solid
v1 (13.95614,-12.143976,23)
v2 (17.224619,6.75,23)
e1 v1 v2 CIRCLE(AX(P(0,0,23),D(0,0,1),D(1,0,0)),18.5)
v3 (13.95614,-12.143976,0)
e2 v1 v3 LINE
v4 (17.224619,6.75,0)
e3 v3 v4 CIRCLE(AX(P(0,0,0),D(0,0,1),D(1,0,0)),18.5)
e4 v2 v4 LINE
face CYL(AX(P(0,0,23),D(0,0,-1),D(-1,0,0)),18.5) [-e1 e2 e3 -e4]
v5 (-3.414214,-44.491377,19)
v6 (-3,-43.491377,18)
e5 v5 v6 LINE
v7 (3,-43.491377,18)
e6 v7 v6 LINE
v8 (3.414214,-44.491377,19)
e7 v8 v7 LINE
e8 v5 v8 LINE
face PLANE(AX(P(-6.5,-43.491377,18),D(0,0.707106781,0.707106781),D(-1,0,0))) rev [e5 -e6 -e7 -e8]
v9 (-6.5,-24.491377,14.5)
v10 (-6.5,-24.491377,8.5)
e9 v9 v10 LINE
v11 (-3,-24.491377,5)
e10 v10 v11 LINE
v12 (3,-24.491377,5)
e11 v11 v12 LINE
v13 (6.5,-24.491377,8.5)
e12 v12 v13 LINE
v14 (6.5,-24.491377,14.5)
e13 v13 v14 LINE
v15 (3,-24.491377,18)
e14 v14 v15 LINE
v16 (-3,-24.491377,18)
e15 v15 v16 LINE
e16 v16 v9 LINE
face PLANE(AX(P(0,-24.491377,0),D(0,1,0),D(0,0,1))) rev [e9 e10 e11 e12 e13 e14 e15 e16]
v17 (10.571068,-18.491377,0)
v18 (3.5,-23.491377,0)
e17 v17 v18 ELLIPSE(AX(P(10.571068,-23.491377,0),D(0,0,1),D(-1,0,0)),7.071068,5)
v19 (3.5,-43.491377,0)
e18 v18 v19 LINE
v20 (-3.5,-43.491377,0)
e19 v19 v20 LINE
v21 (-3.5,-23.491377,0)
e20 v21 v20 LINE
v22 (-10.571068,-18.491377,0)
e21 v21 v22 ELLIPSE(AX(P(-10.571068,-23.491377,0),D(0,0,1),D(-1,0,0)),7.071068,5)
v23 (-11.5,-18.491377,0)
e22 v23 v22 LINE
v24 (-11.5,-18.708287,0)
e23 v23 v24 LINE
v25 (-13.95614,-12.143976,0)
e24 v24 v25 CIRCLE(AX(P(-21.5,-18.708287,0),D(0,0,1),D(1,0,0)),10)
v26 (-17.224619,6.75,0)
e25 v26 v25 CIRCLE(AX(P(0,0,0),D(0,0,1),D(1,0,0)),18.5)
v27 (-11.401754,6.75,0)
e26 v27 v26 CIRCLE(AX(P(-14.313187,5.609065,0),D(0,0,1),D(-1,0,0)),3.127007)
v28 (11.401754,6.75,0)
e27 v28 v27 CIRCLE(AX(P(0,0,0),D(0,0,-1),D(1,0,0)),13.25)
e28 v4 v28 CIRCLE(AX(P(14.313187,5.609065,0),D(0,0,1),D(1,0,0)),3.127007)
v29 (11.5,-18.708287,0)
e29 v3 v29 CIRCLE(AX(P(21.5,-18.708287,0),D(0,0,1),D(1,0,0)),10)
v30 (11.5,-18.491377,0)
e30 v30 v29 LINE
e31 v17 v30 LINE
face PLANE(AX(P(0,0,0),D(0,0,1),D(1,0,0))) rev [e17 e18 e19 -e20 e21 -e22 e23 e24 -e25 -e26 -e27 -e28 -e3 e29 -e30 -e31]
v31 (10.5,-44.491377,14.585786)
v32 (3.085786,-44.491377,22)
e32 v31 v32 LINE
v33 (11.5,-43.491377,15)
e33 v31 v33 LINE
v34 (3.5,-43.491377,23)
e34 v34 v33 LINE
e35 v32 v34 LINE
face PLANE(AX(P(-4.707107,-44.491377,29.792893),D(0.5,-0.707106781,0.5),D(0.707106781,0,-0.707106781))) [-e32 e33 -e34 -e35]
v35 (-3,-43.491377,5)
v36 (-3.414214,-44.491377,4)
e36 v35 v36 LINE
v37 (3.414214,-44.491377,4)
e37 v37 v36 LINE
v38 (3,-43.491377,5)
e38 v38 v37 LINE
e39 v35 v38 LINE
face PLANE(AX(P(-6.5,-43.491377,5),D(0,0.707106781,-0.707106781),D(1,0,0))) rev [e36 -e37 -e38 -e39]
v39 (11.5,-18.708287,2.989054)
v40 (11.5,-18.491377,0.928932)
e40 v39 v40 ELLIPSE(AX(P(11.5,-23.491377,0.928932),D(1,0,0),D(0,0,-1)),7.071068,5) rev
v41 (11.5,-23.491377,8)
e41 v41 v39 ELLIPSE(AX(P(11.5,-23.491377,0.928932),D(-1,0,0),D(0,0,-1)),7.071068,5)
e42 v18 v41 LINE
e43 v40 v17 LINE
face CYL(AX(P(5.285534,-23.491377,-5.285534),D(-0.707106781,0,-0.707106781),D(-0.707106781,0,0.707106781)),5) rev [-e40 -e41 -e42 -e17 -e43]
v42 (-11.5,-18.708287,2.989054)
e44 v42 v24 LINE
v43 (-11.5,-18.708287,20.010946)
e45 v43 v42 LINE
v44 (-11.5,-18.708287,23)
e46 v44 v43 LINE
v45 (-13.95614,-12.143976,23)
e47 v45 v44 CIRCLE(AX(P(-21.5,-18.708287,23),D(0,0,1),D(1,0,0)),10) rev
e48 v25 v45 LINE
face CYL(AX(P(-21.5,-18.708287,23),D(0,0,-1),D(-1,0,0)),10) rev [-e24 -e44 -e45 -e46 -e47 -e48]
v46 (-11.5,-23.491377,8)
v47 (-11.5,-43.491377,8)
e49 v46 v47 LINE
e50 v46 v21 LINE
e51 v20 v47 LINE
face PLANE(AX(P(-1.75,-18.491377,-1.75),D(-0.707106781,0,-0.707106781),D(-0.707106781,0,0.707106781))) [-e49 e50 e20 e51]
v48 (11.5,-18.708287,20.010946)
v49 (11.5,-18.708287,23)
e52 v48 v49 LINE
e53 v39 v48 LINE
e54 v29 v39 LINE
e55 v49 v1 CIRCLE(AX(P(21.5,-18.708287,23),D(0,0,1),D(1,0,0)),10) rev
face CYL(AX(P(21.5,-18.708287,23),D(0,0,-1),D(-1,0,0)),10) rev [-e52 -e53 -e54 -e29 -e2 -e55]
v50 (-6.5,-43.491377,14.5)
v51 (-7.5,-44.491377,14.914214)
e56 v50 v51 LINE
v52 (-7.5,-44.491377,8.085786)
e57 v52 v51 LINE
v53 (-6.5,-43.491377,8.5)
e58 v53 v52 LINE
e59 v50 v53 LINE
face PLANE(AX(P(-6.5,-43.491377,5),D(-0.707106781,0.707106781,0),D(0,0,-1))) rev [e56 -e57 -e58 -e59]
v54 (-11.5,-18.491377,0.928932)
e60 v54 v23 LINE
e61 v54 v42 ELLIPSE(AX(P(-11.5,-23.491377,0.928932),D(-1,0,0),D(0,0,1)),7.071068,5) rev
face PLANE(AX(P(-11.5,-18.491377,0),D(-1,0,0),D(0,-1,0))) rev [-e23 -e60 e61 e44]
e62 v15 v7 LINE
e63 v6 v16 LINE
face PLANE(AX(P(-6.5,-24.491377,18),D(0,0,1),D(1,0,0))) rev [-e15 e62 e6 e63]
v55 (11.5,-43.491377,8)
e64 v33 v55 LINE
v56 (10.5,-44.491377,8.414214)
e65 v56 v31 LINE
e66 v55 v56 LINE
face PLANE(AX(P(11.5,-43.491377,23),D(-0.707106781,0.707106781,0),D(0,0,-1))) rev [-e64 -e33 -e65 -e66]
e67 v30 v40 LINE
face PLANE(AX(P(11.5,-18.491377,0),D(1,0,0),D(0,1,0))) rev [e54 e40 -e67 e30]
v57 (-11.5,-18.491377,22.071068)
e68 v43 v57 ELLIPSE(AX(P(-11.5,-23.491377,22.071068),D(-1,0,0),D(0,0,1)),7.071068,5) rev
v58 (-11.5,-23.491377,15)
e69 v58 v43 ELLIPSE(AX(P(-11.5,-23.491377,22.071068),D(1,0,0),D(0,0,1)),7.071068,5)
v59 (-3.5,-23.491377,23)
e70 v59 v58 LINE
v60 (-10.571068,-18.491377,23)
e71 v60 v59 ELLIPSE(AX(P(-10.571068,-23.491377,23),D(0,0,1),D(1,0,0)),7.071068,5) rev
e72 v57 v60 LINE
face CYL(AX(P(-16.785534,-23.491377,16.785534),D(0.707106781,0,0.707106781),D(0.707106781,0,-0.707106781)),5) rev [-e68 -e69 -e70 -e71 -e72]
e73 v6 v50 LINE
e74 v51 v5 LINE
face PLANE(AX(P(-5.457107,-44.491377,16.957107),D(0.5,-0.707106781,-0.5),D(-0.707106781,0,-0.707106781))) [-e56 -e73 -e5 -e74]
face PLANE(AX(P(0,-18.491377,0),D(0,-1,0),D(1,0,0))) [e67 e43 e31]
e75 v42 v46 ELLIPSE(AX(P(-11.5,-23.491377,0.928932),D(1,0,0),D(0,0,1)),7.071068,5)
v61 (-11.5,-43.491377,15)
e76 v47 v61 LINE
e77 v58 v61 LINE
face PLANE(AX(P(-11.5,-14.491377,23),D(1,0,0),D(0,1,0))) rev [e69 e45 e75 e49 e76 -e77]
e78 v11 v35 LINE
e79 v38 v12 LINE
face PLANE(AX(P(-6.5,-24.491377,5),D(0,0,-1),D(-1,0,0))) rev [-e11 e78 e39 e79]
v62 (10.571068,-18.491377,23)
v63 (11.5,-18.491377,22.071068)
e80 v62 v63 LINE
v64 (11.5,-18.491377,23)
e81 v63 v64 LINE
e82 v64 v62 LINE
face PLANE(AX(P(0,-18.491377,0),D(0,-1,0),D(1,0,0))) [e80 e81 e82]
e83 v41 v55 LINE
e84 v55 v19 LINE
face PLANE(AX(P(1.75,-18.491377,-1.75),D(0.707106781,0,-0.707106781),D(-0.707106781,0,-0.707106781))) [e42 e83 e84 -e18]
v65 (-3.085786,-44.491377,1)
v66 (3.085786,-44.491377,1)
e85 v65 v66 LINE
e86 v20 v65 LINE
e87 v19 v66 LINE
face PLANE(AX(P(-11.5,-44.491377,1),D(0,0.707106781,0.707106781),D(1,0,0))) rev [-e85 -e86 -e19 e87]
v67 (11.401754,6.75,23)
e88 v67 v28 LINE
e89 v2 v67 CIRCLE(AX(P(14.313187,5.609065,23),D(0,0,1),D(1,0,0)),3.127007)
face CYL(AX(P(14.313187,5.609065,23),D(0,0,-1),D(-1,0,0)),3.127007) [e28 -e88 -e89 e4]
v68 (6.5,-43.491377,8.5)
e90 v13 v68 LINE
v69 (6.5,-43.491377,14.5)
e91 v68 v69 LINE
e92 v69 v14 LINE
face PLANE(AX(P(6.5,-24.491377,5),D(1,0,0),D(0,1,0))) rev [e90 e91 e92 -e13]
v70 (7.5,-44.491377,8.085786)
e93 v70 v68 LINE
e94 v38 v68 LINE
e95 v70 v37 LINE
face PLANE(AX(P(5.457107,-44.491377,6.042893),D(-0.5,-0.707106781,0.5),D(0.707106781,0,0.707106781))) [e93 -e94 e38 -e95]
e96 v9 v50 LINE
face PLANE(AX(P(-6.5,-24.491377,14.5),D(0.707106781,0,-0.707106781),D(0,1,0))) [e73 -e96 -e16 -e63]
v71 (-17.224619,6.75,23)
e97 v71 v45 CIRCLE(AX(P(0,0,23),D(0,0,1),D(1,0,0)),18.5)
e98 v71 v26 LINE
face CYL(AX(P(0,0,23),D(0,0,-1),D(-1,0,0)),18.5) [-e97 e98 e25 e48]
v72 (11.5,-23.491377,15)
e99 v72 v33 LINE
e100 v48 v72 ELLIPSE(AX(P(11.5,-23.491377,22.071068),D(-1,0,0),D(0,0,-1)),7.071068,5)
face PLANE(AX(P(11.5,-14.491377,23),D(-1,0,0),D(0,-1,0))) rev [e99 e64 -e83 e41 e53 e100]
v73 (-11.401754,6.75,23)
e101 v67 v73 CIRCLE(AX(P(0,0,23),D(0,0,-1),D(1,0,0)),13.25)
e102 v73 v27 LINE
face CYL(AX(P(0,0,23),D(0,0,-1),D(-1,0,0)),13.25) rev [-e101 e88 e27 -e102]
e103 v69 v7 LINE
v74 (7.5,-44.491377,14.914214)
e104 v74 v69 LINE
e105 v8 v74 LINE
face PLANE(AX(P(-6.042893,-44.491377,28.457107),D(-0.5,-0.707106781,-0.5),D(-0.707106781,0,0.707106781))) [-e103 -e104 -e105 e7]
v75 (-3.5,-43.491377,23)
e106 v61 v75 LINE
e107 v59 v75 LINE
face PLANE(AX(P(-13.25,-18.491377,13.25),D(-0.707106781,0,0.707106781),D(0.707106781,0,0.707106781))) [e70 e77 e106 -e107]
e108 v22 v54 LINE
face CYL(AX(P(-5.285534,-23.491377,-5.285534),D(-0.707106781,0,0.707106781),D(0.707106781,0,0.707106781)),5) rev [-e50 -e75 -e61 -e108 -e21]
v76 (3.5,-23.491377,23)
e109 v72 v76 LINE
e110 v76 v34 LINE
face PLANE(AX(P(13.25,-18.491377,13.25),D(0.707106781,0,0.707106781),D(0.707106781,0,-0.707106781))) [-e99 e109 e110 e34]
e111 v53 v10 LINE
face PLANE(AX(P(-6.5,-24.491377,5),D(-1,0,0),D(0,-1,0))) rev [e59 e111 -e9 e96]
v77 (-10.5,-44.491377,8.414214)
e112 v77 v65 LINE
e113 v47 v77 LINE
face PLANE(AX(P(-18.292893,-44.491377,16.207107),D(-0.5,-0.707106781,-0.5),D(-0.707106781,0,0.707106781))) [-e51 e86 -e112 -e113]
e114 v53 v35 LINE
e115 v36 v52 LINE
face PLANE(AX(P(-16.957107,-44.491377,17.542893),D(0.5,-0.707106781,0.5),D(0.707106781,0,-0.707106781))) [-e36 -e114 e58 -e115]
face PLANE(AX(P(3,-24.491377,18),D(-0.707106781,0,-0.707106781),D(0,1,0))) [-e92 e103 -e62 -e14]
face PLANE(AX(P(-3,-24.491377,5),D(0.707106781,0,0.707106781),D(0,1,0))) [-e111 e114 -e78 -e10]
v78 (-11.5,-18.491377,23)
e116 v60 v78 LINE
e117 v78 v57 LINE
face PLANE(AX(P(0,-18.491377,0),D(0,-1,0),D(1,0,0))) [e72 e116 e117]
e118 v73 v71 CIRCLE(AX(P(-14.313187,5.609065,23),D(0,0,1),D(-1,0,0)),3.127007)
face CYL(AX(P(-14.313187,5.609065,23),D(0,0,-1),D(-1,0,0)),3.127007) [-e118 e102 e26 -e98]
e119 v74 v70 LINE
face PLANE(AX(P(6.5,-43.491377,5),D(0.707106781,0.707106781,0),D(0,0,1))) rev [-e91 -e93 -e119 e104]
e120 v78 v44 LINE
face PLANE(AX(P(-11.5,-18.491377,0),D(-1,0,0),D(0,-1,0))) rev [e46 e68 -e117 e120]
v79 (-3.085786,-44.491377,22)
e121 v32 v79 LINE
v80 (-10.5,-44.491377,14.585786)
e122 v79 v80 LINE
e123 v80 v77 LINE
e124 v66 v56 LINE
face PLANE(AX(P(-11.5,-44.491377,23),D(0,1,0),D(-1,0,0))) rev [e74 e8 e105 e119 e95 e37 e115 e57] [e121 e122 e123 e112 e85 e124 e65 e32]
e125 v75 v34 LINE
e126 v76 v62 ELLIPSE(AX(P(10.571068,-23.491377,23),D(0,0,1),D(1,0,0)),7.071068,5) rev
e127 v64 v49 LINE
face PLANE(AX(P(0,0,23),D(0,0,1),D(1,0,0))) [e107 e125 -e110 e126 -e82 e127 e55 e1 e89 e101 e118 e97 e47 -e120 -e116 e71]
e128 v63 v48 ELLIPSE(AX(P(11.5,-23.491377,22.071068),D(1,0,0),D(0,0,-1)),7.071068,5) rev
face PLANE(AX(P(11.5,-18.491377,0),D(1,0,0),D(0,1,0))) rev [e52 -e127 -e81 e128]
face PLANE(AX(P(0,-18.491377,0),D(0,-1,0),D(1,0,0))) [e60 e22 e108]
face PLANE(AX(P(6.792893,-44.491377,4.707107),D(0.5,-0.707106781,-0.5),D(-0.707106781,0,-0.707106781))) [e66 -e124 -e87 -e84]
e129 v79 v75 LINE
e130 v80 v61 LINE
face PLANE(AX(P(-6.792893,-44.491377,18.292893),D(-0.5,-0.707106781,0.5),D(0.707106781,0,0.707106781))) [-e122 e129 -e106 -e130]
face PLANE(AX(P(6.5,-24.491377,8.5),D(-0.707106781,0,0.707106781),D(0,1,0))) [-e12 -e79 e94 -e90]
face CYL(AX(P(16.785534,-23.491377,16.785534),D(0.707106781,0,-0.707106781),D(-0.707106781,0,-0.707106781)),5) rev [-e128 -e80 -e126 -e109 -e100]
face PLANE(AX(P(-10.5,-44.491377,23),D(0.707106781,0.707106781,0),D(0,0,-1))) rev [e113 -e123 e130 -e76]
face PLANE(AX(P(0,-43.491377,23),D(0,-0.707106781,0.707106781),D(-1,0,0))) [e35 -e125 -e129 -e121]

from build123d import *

# Parameters (mm, degrees)
BOSS_EXTRUDE1_DEPTH = 23
FILLET1_R           = 10
SKETCH2_W           = 13
SKETCH2_H           = 13
CUT_EXTRUDE1_DEPTH  = 20
CHAMFER2_SIZE       = 3.5
CUT_EXTRUDE2_DEPTH  = 26
CHAMFER3_SIZE       = 1
FILLET2_R           = 5


with BuildPart() as part:
    # Sketch1 → Boss-Extrude1 (new body)
    with BuildSketch(Plane.XY):
        with BuildLine():
            Line((-11.5, -14.491376746), (-11.5, -44.491376746))
            Line((-11.5, -44.491376746), (11.5, -44.491376746))
            Line((11.5, -44.491376746), (11.5, -14.491376746))
            ThreePointArc((11.5, -14.491376746), (17.862669336, -4.814046549), (17.224619009, 6.75))
            ThreePointArc((17.224619009, 6.75), (14.31318663, 8.736071822), (11.401754251, 6.75))
            ThreePointArc((11.401754251, 6.75), (0, -13.25), (-11.401754251, 6.75))
            ThreePointArc((-11.401754251, 6.75), (-14.31318663, 8.736071822), (-17.224619009, 6.75))
            ThreePointArc((-17.224619009, 6.75), (-17.862669336, -4.814046549), (-11.5, -14.491376746))
        make_face()
    extrude(amount=BOSS_EXTRUDE1_DEPTH)

    # Fillet1
    fillet1_edges = [part.edges().sort_by_distance(p)[0] for p in [
        (-11.5, -14.491376746, 11.5),
        (11.5, -14.491376746, 11.5),
    ]]
    fillet(fillet1_edges, radius=FILLET1_R)

    # Sketch2 → Cut-Extrude1 (cut)
    with BuildSketch(Plane.XZ.offset(44.491376746)):
        with Locations((0, 11.5)):
            Rectangle(SKETCH2_W, SKETCH2_H)
    extrude(amount=-CUT_EXTRUDE1_DEPTH, mode=Mode.SUBTRACT)

    # Chamfer2
    chamfer2_edges = [part.edges().sort_by_distance(p)[0] for p in [
        (-6.5, -34.491376746, 5),
        (-6.5, -34.491376746, 18),
        (6.5, -34.491376746, 18),
        (6.5, -34.491376746, 5),
    ]]
    chamfer(chamfer2_edges, length=CHAMFER2_SIZE)

    # Sketch3 → Cut-Extrude2 (cut)
    with BuildSketch(Plane.XZ.offset(44.491376746)):
        Polygon((-11.5, 15), (-3.5, 23), (-11.5, 23), align=None)
        Polygon((3.5, 23), (11.5, 15), (11.5, 23), align=None)
        Polygon((11.5, 0), (11.5, 8), (3.5, 0), align=None)
        Polygon((-11.5, 0), (-3.5, 0), (-11.5, 8), align=None)
    extrude(amount=-CUT_EXTRUDE2_DEPTH, mode=Mode.SUBTRACT)

    # Chamfer3
    chamfer3_edges = [part.edges().sort_by_distance(p)[0] for p in [
        (7.5, -44.491376746, 4),
        (7.5, -44.491376746, 19),
        (-7.5, -44.491376746, 19),
        (0, -44.491376746, 5),
        (-6.5, -44.491376746, 11.5),
        (6.5, -44.491376746, 11.5),
        (0, -44.491376746, 18),
        (-4.75, -44.491376746, 6.75),
        (4.75, -44.491376746, 6.75),
        (4.75, -44.491376746, 16.25),
        (-4.75, -44.491376746, 16.25),
        (0, -44.491376746, 0),
        (0, -44.491376746, 23),
        (11.5, -44.491376746, 11.5),
        (-11.5, -44.491376746, 11.5),
        (-7.5, -44.491376746, 4),
    ]]
    chamfer(chamfer3_edges, length=CHAMFER3_SIZE)

    # Fillet2
    # the kernel refuses this fillet: 5 mm, written as the material it adds along each edge
    with BuildSketch(Plane(origin=(20.338834765, -18.491376746, 16.838834765), x_dir=(0, -1, 0), z_dir=(-0.7071067811865476, 0, -0.7071067811865476))) as fillet2_piece_1_section:
        with BuildLine():
            CenterArc((FILLET2_R, -FILLET2_R), FILLET2_R, 90, 90)
            Line((0, -FILLET2_R), (0, 0))
            Line((0, 0), (FILLET2_R, 0))
        make_face()
    fillet2_piece_1 = extrude(amount=36.313708499, mode=Mode.PRIVATE)
    fillet2_piece_1 = split(fillet2_piece_1, bisect_by=Plane(origin=(11.5, -19.775050917, 3.381146021), z_dir=(-1, 0, 0)), keep=Keep.TOP, mode=Mode.PRIVATE)
    fillet2_piece_1 = split(fillet2_piece_1, bisect_by=Plane(origin=(8.118853979, -19.775050917, 0), z_dir=(0, 0, 1)), keep=Keep.TOP, mode=Mode.PRIVATE)
    add(fillet2_piece_1)
    with BuildSketch(Plane(origin=(-5.338834765, -18.491376746, 31.838834765), x_dir=(0, -1, 0), z_dir=(0.7071067811865476, 0, -0.7071067811865476))) as fillet2_piece_2_section:
        with BuildLine():
            CenterArc((FILLET2_R, -FILLET2_R), FILLET2_R, 90, 90)
            Line((0, -FILLET2_R), (0, 0))
            Line((0, 0), (FILLET2_R, 0))
        make_face()
    fillet2_piece_2 = extrude(amount=36.313708499, mode=Mode.PRIVATE)
    fillet2_piece_2 = split(fillet2_piece_2, bisect_by=Plane(origin=(8.118853979, -19.775050917, 23), z_dir=(0, 0, -1)), keep=Keep.TOP, mode=Mode.PRIVATE)
    fillet2_piece_2 = split(fillet2_piece_2, bisect_by=Plane(origin=(11.5, -19.775050917, 19.618853979), z_dir=(-1, 0, 0)), keep=Keep.TOP, mode=Mode.PRIVATE)
    add(fillet2_piece_2)
    with BuildSketch(Plane(origin=(-20.338834765, -18.491376746, 6.161165235), x_dir=(0, -1, 0), z_dir=(0.7071067811865476, 0, 0.7071067811865476))) as fillet2_piece_3_section:
        with BuildLine():
            CenterArc((FILLET2_R, -FILLET2_R), FILLET2_R, 90, 90)
            Line((0, -FILLET2_R), (0, 0))
            Line((0, 0), (FILLET2_R, 0))
        make_face()
    fillet2_piece_3 = extrude(amount=36.313708499, mode=Mode.PRIVATE)
    fillet2_piece_3 = split(fillet2_piece_3, bisect_by=Plane(origin=(-8.118853979, -19.775050917, 23), z_dir=(0, 0, -1)), keep=Keep.TOP, mode=Mode.PRIVATE)
    fillet2_piece_3 = split(fillet2_piece_3, bisect_by=Plane(origin=(-11.5, -19.775050917, 19.618853979), z_dir=(1, 0, 0)), keep=Keep.TOP, mode=Mode.PRIVATE)
    add(fillet2_piece_3)
    with BuildSketch(Plane(origin=(5.338834765, -18.491376746, -8.838834765), x_dir=(0, -1, 0), z_dir=(-0.7071067811865476, 0, 0.7071067811865476))) as fillet2_piece_4_section:
        with BuildLine():
            CenterArc((FILLET2_R, -FILLET2_R), FILLET2_R, 90, 90)
            Line((0, -FILLET2_R), (0, 0))
            Line((0, 0), (FILLET2_R, 0))
        make_face()
    fillet2_piece_4 = extrude(amount=36.313708499, mode=Mode.PRIVATE)
    fillet2_piece_4 = split(fillet2_piece_4, bisect_by=Plane(origin=(-8.118853979, -19.775050917, 0), z_dir=(0, 0, 1)), keep=Keep.TOP, mode=Mode.PRIVATE)
    fillet2_piece_4 = split(fillet2_piece_4, bisect_by=Plane(origin=(-11.5, -19.775050917, 3.381146021), z_dir=(1, 0, 0)), keep=Keep.TOP, mode=Mode.PRIVATE)
    add(fillet2_piece_4)


solid = part.part
